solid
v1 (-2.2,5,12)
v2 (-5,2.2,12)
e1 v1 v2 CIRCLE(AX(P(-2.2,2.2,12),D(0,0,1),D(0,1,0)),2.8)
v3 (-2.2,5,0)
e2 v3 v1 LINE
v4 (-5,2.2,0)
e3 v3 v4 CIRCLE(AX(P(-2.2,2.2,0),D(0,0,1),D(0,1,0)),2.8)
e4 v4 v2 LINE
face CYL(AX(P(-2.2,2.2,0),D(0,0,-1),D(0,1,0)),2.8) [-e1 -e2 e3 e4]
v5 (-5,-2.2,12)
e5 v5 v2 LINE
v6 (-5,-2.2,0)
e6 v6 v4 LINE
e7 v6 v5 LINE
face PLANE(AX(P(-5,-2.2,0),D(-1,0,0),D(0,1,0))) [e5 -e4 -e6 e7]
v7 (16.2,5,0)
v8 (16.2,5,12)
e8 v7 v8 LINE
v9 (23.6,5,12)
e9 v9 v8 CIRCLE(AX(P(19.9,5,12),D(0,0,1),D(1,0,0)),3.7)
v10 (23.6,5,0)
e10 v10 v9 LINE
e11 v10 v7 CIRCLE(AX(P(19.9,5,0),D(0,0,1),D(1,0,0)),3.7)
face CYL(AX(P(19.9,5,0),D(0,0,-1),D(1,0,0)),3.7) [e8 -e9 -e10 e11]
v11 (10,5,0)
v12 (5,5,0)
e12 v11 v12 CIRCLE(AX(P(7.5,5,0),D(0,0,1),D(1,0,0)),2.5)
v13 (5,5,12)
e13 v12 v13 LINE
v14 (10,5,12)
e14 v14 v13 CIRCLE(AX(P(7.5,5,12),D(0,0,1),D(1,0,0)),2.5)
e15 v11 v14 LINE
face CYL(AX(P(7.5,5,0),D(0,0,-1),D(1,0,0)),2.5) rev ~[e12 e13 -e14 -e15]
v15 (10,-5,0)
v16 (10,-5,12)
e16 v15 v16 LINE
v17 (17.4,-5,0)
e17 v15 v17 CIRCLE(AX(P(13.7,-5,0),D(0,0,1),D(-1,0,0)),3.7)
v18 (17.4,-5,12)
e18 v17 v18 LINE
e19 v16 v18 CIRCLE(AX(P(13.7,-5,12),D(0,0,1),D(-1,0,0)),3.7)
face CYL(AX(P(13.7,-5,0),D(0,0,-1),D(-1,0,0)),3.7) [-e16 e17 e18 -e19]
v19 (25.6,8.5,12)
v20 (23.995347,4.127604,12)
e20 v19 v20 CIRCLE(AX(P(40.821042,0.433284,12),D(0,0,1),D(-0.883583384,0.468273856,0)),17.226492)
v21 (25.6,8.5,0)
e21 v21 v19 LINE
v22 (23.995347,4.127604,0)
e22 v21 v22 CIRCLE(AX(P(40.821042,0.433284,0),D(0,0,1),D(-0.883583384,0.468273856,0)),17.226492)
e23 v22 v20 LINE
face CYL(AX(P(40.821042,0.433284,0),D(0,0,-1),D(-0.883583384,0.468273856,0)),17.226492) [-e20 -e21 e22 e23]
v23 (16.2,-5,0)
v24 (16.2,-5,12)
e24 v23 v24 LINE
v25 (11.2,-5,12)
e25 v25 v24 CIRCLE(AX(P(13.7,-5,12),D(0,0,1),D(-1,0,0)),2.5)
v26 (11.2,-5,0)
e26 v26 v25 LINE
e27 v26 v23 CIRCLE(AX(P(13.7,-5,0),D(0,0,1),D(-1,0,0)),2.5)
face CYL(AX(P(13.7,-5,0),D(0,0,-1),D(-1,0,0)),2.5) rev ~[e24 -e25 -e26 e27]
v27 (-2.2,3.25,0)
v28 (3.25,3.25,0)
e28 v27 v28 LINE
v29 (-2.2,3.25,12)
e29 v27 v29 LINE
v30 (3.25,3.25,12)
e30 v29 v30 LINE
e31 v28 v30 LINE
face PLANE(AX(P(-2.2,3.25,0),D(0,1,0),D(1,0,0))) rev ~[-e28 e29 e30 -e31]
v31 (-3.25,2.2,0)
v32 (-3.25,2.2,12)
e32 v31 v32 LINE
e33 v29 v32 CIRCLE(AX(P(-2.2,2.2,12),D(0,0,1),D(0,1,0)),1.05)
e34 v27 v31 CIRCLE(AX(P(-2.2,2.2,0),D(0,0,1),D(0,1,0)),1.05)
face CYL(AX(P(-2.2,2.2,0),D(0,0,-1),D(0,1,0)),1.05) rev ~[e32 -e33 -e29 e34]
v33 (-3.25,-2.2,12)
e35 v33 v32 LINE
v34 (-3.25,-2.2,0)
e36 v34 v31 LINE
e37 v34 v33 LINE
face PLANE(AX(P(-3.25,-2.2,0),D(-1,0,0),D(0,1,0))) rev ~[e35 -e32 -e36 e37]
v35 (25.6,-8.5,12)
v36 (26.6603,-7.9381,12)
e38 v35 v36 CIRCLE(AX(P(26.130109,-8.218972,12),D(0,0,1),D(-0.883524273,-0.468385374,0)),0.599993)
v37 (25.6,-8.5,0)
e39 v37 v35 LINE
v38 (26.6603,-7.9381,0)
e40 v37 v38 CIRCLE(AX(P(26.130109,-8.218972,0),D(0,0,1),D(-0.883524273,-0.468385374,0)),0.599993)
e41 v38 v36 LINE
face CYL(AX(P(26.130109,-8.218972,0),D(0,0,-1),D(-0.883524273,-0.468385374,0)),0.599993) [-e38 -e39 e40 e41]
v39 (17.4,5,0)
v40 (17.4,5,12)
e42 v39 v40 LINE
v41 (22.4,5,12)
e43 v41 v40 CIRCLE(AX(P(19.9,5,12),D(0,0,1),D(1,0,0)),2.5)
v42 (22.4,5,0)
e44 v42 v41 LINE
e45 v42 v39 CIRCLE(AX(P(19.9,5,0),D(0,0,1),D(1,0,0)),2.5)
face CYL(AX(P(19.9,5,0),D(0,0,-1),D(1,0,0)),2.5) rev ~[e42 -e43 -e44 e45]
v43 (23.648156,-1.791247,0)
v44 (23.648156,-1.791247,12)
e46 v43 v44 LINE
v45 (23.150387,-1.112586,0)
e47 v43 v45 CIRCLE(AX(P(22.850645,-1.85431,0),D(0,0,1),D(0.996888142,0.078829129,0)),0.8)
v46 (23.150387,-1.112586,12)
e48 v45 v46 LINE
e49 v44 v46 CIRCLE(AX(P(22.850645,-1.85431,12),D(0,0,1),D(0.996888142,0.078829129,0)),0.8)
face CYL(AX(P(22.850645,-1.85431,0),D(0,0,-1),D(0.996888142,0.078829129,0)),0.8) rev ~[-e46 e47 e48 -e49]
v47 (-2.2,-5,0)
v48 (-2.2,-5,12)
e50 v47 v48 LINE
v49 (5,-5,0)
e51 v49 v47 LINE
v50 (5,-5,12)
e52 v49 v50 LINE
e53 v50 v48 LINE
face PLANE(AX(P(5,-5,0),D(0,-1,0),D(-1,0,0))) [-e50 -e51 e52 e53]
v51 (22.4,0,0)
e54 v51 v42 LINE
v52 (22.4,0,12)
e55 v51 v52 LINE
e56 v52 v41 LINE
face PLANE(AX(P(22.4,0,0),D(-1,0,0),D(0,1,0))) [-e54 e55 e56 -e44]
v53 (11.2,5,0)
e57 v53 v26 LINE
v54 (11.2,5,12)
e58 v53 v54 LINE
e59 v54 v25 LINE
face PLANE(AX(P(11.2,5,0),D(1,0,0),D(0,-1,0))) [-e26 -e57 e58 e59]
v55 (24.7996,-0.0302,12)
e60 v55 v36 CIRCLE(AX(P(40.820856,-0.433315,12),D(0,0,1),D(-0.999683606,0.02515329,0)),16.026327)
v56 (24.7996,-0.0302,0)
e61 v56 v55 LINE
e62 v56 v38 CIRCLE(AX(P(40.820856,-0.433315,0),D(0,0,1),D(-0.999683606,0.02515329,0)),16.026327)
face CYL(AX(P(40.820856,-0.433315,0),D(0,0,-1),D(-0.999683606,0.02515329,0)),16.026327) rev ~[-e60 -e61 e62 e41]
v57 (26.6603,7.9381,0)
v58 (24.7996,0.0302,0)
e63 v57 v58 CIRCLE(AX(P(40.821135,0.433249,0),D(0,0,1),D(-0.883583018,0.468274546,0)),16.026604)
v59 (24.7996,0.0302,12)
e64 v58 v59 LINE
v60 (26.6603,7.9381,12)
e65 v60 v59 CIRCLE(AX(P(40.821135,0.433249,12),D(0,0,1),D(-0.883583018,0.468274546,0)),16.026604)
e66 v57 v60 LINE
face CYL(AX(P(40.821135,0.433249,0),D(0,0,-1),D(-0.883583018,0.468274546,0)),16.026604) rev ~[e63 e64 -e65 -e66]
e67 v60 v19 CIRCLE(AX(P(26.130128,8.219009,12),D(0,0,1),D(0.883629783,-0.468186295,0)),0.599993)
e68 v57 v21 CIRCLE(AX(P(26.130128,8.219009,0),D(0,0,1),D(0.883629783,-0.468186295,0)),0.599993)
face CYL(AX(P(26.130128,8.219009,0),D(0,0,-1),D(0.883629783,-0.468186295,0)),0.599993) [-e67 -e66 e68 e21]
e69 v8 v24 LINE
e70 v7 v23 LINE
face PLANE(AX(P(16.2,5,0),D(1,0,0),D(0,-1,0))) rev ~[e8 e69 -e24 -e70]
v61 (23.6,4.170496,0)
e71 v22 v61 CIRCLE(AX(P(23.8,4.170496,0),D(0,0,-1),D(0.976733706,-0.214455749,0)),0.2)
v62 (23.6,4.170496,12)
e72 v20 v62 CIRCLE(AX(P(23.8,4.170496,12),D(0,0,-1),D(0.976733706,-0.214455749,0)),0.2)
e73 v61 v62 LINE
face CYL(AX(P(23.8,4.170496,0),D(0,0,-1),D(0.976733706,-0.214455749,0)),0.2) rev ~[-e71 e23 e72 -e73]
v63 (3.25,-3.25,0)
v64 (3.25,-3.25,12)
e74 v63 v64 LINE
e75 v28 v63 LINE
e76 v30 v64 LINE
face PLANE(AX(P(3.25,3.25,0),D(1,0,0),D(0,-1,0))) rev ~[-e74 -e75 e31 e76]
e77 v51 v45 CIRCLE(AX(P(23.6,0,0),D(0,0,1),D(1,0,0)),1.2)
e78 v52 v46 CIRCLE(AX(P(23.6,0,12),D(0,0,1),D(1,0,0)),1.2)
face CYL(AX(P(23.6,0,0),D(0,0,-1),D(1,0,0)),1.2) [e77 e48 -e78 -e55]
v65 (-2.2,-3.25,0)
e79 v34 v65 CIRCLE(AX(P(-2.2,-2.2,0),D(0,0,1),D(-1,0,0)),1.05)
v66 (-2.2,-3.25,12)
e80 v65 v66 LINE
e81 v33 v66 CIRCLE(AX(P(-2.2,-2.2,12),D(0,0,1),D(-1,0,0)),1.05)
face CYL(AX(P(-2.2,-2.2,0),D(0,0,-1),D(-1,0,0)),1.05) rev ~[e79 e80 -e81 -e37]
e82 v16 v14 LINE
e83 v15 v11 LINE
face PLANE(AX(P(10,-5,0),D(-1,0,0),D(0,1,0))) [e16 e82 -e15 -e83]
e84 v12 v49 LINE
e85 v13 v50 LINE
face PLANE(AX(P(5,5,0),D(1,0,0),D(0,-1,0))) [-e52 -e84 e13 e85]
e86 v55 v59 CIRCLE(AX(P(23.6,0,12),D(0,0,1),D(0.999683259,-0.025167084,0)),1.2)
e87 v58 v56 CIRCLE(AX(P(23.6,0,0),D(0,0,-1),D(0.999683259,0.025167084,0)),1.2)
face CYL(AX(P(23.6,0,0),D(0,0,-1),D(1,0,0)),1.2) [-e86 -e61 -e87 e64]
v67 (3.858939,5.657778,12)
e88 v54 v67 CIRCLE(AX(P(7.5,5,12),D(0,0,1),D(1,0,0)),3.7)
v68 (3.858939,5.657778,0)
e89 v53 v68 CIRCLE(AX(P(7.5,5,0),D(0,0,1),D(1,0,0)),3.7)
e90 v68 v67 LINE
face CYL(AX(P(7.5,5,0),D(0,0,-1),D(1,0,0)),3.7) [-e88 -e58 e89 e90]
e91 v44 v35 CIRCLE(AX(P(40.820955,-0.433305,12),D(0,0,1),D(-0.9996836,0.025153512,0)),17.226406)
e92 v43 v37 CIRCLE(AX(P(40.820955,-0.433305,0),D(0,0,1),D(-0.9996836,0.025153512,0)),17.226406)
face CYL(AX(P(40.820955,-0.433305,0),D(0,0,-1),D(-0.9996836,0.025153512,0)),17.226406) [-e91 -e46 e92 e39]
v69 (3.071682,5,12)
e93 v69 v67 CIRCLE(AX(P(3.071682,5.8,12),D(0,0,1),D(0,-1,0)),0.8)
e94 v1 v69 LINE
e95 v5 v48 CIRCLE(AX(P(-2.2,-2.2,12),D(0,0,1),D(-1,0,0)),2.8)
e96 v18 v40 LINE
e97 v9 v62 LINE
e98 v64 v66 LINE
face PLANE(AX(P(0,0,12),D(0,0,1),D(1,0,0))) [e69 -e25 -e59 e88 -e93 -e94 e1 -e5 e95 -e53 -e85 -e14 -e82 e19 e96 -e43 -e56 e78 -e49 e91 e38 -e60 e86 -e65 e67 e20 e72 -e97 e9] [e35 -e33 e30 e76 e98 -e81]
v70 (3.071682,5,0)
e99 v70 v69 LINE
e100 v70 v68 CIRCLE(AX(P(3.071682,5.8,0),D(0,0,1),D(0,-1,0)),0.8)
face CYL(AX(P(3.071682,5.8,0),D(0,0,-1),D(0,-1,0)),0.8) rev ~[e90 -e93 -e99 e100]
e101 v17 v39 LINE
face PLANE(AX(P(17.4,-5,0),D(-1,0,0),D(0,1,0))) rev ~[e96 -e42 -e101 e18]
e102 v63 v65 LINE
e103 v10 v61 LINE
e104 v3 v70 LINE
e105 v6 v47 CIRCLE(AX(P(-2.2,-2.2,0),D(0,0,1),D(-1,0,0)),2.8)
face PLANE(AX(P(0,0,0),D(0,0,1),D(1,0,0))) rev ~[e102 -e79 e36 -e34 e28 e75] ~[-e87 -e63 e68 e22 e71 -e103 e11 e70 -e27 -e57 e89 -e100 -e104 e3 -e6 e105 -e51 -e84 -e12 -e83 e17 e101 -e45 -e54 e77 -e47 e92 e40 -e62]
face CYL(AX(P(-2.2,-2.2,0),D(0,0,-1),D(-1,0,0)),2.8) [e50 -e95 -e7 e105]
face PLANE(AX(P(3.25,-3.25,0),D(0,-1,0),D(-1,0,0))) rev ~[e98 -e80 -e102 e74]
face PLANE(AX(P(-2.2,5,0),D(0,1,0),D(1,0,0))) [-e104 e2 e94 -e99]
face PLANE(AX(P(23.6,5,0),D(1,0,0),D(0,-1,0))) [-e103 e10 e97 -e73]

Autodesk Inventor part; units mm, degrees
ref_plane "YZ Plane" through (0, 0, 0) normal (1, 0, 0) x (0, 1, 0)
ref_plane "XZ Plane" through (0, 0, 0) normal (0, 1, 0) x (-1, 0, 0)
ref_plane "XY Plane" through (0, 0, 0) normal (0, 0, 1) x (1, 0, 0)
sketch "Boceto1" plane through (0, 0, 0) normal (0, 0, 1) x (1, 0, 0)
  line L0 (3, -11.4) -> (3, -5.5)
  line L1 (3, -5.5) -> (-2.2, -5.5)
  arc A0 (-5.5, -2.2) -> (-2.2, -5.5) centre (-2.2, -2.2) ccw
  line L2 (-5.5, -2.2) -> (-5.5, 2.2)
  arc A1 (-2.2, 5.5) -> (-5.5, 2.2) centre (-2.2, 2.2) ccw
  line L3 (-2.2, 5.5) -> (3, 5.5)
  line L4 (3, 5.5) -> (3, 11.4)
  line L5 (3, 3) -> (-2.2, 3)
  arc A2 (-2.2, 3) -> (-3, 2.2) centre (-2.2, 2.2) ccw
  line L6 (-3, 2.2) -> (-3, -2.2)
  arc A3 (-3, -2.2) -> (-2.2, -3) centre (-2.2, -2.2) ccw
  line L7 (-2.2, -3) -> (3, -3)
  line L8 (3, -3) -> (3, 3)
  line L9 (-2.2, 3.25) -> (3.25, 3.25)
  line L10 (3.25, 3.25) -> (3.25, -3.25)
  line L11 (3.25, -3.25) -> (-2.2, -3.25)
  arc A4 (-3.25, -2.2) -> (-2.2, -3.25) centre (-2.2, -2.2) ccw
  line L12 (-3.25, -2.2) -> (-3.25, 2.2)
  arc A5 (-2.2, 3.25) -> (-3.25, 2.2) centre (-2.2, 2.2) ccw
  line L13 (-2.2, 5) -> (5, 5)
  line L14 (5, 5) -> (5, -5)
  line L15 (5, -5) -> (-2.2, -5)
  arc A6 (-5, -2.2) -> (-2.2, -5) centre (-2.2, -2.2) ccw
  line L16 (-5, -2.2) -> (-5, 2.2)
  arc A7 (-2.2, 5) -> (-5, 2.2) centre (-2.2, 2.2) ccw
  line L17 (5, 5) -> (7.5, 5)
  line L18 (10, 5) -> (11.2, 5)
  line L19 (11.2, 5) -> (11.2, -5)
  line L20 (11.2, -5) -> (10, -5)
  line L21 (10, -5) -> (10, 5)
  line L22 (11.2, -5) -> (13.7, -5)
  line L23 (16.2, -5) -> (17.4, -5)
  line L24 (17.4, -5) -> (17.4, 5)
  line L25 (17.4, 5) -> (16.2, 5)
  line L26 (16.2, 5) -> (16.2, -5)
  line L27 (17.4, 5) -> (19.9, 5)
  line L28 (22.4, 5) -> (23.6, 5)
  line L29 (23.6, 5) -> (23.6, 0)
  line L30 (23.6, 0) -> (22.4, 0)
  line L31 (22.4, 0) -> (22.4, 5)
  arc A8 (11.2, 5) -> (3.8, 5) centre (7.5, 5) ccw
  arc A9 (10, 5) -> (5, 5) centre (7.5, 5) ccw
  arc A10 (10, -5) -> (17.4, -5) centre (13.7, -5) ccw
  arc A11 (11.2, -5) -> (16.2, -5) centre (13.7, -5) ccw
  arc A12 (22.4, 5) -> (17.4, 5) centre (19.9, 5) ccw
  arc A13 (23.6, 5) -> (16.2, 5) centre (19.9, 5) ccw
  arc A14 (25.6, 8.5) -> (23.6, 0) centre (40.821, 0.4333) ccw
  circle A15 centre (23.6, 0) radius 1.2
  arc A16 (26.6603, 7.9381) -> (24.7996, 0.0302) centre (40.821, 0.4333) ccw
  line L32 (25.6, 8.5) -> (25.9736, 8.302)
  arc A17 (26.6603, 7.9381) -> (25.6, 8.5) centre (26.1301, 8.219) ccw
  arc A18 (23.6, 0) -> (25.6, -8.5) centre (40.821, -0.4333) ccw
  arc A19 (24.7996, -0.0302) -> (26.6603, -7.9381) centre (40.821, -0.4333) ccw
  line L33 (25.9736, -8.302) -> (26.6603, -7.9381)
  arc A20 (25.6, -8.5) -> (26.6603, -7.9381) centre (26.1301, -8.219) ccw
  point P0 (0, 0)
  point P1 (5, -5)
  point P2 (4.2, -5)
  point P3 (23, 0)
  point P4 (23.6, 1.2)
  point P5 (23.6116, -1.1999)
  point P6 (24.7996, 0.0302)
  point P7 (23.6116, 1.1999)
  dimension "d1" = 0.25
  dimension "d2" = 2
  dimension "d31" = 2.5
  dimension "d33" = 10
  dimension "d34" = 2.5
  dimension "d35" = 1.2
  dimension "d36" = 10
  dimension "d37" = 2.5
  dimension "d41" = 1.2
extrude "Extrusión1" add sketch "Boceto1" along normal blind 12 contours L13 L14 L15 A6 L16 A7 | A8 L18 A9 L13 | L19 L20 L21 L18 | A11 L23 A10 L20 | L26 L25 L24 L23 | A13 L28 A12 L25 | L29 A15 L31 L28 | A15 A14 L29 | L29 A14 L30 A15 | L30 A18 A15 | A14 A15 A18 L29 | L29 A14 | A14 A17 A16 A15 | A15 A19 A20 A18
fillet "Empalme1" radius 0.8 2 edges at (3.8, 5, 6) (23.6116, -1.1999, 6)
fillet "Empalme1" radius 0.2 2 edges at (23.6, 1.2, 6) (23.6116, 1.1999, 6)
properties part number "_3DPrint"
